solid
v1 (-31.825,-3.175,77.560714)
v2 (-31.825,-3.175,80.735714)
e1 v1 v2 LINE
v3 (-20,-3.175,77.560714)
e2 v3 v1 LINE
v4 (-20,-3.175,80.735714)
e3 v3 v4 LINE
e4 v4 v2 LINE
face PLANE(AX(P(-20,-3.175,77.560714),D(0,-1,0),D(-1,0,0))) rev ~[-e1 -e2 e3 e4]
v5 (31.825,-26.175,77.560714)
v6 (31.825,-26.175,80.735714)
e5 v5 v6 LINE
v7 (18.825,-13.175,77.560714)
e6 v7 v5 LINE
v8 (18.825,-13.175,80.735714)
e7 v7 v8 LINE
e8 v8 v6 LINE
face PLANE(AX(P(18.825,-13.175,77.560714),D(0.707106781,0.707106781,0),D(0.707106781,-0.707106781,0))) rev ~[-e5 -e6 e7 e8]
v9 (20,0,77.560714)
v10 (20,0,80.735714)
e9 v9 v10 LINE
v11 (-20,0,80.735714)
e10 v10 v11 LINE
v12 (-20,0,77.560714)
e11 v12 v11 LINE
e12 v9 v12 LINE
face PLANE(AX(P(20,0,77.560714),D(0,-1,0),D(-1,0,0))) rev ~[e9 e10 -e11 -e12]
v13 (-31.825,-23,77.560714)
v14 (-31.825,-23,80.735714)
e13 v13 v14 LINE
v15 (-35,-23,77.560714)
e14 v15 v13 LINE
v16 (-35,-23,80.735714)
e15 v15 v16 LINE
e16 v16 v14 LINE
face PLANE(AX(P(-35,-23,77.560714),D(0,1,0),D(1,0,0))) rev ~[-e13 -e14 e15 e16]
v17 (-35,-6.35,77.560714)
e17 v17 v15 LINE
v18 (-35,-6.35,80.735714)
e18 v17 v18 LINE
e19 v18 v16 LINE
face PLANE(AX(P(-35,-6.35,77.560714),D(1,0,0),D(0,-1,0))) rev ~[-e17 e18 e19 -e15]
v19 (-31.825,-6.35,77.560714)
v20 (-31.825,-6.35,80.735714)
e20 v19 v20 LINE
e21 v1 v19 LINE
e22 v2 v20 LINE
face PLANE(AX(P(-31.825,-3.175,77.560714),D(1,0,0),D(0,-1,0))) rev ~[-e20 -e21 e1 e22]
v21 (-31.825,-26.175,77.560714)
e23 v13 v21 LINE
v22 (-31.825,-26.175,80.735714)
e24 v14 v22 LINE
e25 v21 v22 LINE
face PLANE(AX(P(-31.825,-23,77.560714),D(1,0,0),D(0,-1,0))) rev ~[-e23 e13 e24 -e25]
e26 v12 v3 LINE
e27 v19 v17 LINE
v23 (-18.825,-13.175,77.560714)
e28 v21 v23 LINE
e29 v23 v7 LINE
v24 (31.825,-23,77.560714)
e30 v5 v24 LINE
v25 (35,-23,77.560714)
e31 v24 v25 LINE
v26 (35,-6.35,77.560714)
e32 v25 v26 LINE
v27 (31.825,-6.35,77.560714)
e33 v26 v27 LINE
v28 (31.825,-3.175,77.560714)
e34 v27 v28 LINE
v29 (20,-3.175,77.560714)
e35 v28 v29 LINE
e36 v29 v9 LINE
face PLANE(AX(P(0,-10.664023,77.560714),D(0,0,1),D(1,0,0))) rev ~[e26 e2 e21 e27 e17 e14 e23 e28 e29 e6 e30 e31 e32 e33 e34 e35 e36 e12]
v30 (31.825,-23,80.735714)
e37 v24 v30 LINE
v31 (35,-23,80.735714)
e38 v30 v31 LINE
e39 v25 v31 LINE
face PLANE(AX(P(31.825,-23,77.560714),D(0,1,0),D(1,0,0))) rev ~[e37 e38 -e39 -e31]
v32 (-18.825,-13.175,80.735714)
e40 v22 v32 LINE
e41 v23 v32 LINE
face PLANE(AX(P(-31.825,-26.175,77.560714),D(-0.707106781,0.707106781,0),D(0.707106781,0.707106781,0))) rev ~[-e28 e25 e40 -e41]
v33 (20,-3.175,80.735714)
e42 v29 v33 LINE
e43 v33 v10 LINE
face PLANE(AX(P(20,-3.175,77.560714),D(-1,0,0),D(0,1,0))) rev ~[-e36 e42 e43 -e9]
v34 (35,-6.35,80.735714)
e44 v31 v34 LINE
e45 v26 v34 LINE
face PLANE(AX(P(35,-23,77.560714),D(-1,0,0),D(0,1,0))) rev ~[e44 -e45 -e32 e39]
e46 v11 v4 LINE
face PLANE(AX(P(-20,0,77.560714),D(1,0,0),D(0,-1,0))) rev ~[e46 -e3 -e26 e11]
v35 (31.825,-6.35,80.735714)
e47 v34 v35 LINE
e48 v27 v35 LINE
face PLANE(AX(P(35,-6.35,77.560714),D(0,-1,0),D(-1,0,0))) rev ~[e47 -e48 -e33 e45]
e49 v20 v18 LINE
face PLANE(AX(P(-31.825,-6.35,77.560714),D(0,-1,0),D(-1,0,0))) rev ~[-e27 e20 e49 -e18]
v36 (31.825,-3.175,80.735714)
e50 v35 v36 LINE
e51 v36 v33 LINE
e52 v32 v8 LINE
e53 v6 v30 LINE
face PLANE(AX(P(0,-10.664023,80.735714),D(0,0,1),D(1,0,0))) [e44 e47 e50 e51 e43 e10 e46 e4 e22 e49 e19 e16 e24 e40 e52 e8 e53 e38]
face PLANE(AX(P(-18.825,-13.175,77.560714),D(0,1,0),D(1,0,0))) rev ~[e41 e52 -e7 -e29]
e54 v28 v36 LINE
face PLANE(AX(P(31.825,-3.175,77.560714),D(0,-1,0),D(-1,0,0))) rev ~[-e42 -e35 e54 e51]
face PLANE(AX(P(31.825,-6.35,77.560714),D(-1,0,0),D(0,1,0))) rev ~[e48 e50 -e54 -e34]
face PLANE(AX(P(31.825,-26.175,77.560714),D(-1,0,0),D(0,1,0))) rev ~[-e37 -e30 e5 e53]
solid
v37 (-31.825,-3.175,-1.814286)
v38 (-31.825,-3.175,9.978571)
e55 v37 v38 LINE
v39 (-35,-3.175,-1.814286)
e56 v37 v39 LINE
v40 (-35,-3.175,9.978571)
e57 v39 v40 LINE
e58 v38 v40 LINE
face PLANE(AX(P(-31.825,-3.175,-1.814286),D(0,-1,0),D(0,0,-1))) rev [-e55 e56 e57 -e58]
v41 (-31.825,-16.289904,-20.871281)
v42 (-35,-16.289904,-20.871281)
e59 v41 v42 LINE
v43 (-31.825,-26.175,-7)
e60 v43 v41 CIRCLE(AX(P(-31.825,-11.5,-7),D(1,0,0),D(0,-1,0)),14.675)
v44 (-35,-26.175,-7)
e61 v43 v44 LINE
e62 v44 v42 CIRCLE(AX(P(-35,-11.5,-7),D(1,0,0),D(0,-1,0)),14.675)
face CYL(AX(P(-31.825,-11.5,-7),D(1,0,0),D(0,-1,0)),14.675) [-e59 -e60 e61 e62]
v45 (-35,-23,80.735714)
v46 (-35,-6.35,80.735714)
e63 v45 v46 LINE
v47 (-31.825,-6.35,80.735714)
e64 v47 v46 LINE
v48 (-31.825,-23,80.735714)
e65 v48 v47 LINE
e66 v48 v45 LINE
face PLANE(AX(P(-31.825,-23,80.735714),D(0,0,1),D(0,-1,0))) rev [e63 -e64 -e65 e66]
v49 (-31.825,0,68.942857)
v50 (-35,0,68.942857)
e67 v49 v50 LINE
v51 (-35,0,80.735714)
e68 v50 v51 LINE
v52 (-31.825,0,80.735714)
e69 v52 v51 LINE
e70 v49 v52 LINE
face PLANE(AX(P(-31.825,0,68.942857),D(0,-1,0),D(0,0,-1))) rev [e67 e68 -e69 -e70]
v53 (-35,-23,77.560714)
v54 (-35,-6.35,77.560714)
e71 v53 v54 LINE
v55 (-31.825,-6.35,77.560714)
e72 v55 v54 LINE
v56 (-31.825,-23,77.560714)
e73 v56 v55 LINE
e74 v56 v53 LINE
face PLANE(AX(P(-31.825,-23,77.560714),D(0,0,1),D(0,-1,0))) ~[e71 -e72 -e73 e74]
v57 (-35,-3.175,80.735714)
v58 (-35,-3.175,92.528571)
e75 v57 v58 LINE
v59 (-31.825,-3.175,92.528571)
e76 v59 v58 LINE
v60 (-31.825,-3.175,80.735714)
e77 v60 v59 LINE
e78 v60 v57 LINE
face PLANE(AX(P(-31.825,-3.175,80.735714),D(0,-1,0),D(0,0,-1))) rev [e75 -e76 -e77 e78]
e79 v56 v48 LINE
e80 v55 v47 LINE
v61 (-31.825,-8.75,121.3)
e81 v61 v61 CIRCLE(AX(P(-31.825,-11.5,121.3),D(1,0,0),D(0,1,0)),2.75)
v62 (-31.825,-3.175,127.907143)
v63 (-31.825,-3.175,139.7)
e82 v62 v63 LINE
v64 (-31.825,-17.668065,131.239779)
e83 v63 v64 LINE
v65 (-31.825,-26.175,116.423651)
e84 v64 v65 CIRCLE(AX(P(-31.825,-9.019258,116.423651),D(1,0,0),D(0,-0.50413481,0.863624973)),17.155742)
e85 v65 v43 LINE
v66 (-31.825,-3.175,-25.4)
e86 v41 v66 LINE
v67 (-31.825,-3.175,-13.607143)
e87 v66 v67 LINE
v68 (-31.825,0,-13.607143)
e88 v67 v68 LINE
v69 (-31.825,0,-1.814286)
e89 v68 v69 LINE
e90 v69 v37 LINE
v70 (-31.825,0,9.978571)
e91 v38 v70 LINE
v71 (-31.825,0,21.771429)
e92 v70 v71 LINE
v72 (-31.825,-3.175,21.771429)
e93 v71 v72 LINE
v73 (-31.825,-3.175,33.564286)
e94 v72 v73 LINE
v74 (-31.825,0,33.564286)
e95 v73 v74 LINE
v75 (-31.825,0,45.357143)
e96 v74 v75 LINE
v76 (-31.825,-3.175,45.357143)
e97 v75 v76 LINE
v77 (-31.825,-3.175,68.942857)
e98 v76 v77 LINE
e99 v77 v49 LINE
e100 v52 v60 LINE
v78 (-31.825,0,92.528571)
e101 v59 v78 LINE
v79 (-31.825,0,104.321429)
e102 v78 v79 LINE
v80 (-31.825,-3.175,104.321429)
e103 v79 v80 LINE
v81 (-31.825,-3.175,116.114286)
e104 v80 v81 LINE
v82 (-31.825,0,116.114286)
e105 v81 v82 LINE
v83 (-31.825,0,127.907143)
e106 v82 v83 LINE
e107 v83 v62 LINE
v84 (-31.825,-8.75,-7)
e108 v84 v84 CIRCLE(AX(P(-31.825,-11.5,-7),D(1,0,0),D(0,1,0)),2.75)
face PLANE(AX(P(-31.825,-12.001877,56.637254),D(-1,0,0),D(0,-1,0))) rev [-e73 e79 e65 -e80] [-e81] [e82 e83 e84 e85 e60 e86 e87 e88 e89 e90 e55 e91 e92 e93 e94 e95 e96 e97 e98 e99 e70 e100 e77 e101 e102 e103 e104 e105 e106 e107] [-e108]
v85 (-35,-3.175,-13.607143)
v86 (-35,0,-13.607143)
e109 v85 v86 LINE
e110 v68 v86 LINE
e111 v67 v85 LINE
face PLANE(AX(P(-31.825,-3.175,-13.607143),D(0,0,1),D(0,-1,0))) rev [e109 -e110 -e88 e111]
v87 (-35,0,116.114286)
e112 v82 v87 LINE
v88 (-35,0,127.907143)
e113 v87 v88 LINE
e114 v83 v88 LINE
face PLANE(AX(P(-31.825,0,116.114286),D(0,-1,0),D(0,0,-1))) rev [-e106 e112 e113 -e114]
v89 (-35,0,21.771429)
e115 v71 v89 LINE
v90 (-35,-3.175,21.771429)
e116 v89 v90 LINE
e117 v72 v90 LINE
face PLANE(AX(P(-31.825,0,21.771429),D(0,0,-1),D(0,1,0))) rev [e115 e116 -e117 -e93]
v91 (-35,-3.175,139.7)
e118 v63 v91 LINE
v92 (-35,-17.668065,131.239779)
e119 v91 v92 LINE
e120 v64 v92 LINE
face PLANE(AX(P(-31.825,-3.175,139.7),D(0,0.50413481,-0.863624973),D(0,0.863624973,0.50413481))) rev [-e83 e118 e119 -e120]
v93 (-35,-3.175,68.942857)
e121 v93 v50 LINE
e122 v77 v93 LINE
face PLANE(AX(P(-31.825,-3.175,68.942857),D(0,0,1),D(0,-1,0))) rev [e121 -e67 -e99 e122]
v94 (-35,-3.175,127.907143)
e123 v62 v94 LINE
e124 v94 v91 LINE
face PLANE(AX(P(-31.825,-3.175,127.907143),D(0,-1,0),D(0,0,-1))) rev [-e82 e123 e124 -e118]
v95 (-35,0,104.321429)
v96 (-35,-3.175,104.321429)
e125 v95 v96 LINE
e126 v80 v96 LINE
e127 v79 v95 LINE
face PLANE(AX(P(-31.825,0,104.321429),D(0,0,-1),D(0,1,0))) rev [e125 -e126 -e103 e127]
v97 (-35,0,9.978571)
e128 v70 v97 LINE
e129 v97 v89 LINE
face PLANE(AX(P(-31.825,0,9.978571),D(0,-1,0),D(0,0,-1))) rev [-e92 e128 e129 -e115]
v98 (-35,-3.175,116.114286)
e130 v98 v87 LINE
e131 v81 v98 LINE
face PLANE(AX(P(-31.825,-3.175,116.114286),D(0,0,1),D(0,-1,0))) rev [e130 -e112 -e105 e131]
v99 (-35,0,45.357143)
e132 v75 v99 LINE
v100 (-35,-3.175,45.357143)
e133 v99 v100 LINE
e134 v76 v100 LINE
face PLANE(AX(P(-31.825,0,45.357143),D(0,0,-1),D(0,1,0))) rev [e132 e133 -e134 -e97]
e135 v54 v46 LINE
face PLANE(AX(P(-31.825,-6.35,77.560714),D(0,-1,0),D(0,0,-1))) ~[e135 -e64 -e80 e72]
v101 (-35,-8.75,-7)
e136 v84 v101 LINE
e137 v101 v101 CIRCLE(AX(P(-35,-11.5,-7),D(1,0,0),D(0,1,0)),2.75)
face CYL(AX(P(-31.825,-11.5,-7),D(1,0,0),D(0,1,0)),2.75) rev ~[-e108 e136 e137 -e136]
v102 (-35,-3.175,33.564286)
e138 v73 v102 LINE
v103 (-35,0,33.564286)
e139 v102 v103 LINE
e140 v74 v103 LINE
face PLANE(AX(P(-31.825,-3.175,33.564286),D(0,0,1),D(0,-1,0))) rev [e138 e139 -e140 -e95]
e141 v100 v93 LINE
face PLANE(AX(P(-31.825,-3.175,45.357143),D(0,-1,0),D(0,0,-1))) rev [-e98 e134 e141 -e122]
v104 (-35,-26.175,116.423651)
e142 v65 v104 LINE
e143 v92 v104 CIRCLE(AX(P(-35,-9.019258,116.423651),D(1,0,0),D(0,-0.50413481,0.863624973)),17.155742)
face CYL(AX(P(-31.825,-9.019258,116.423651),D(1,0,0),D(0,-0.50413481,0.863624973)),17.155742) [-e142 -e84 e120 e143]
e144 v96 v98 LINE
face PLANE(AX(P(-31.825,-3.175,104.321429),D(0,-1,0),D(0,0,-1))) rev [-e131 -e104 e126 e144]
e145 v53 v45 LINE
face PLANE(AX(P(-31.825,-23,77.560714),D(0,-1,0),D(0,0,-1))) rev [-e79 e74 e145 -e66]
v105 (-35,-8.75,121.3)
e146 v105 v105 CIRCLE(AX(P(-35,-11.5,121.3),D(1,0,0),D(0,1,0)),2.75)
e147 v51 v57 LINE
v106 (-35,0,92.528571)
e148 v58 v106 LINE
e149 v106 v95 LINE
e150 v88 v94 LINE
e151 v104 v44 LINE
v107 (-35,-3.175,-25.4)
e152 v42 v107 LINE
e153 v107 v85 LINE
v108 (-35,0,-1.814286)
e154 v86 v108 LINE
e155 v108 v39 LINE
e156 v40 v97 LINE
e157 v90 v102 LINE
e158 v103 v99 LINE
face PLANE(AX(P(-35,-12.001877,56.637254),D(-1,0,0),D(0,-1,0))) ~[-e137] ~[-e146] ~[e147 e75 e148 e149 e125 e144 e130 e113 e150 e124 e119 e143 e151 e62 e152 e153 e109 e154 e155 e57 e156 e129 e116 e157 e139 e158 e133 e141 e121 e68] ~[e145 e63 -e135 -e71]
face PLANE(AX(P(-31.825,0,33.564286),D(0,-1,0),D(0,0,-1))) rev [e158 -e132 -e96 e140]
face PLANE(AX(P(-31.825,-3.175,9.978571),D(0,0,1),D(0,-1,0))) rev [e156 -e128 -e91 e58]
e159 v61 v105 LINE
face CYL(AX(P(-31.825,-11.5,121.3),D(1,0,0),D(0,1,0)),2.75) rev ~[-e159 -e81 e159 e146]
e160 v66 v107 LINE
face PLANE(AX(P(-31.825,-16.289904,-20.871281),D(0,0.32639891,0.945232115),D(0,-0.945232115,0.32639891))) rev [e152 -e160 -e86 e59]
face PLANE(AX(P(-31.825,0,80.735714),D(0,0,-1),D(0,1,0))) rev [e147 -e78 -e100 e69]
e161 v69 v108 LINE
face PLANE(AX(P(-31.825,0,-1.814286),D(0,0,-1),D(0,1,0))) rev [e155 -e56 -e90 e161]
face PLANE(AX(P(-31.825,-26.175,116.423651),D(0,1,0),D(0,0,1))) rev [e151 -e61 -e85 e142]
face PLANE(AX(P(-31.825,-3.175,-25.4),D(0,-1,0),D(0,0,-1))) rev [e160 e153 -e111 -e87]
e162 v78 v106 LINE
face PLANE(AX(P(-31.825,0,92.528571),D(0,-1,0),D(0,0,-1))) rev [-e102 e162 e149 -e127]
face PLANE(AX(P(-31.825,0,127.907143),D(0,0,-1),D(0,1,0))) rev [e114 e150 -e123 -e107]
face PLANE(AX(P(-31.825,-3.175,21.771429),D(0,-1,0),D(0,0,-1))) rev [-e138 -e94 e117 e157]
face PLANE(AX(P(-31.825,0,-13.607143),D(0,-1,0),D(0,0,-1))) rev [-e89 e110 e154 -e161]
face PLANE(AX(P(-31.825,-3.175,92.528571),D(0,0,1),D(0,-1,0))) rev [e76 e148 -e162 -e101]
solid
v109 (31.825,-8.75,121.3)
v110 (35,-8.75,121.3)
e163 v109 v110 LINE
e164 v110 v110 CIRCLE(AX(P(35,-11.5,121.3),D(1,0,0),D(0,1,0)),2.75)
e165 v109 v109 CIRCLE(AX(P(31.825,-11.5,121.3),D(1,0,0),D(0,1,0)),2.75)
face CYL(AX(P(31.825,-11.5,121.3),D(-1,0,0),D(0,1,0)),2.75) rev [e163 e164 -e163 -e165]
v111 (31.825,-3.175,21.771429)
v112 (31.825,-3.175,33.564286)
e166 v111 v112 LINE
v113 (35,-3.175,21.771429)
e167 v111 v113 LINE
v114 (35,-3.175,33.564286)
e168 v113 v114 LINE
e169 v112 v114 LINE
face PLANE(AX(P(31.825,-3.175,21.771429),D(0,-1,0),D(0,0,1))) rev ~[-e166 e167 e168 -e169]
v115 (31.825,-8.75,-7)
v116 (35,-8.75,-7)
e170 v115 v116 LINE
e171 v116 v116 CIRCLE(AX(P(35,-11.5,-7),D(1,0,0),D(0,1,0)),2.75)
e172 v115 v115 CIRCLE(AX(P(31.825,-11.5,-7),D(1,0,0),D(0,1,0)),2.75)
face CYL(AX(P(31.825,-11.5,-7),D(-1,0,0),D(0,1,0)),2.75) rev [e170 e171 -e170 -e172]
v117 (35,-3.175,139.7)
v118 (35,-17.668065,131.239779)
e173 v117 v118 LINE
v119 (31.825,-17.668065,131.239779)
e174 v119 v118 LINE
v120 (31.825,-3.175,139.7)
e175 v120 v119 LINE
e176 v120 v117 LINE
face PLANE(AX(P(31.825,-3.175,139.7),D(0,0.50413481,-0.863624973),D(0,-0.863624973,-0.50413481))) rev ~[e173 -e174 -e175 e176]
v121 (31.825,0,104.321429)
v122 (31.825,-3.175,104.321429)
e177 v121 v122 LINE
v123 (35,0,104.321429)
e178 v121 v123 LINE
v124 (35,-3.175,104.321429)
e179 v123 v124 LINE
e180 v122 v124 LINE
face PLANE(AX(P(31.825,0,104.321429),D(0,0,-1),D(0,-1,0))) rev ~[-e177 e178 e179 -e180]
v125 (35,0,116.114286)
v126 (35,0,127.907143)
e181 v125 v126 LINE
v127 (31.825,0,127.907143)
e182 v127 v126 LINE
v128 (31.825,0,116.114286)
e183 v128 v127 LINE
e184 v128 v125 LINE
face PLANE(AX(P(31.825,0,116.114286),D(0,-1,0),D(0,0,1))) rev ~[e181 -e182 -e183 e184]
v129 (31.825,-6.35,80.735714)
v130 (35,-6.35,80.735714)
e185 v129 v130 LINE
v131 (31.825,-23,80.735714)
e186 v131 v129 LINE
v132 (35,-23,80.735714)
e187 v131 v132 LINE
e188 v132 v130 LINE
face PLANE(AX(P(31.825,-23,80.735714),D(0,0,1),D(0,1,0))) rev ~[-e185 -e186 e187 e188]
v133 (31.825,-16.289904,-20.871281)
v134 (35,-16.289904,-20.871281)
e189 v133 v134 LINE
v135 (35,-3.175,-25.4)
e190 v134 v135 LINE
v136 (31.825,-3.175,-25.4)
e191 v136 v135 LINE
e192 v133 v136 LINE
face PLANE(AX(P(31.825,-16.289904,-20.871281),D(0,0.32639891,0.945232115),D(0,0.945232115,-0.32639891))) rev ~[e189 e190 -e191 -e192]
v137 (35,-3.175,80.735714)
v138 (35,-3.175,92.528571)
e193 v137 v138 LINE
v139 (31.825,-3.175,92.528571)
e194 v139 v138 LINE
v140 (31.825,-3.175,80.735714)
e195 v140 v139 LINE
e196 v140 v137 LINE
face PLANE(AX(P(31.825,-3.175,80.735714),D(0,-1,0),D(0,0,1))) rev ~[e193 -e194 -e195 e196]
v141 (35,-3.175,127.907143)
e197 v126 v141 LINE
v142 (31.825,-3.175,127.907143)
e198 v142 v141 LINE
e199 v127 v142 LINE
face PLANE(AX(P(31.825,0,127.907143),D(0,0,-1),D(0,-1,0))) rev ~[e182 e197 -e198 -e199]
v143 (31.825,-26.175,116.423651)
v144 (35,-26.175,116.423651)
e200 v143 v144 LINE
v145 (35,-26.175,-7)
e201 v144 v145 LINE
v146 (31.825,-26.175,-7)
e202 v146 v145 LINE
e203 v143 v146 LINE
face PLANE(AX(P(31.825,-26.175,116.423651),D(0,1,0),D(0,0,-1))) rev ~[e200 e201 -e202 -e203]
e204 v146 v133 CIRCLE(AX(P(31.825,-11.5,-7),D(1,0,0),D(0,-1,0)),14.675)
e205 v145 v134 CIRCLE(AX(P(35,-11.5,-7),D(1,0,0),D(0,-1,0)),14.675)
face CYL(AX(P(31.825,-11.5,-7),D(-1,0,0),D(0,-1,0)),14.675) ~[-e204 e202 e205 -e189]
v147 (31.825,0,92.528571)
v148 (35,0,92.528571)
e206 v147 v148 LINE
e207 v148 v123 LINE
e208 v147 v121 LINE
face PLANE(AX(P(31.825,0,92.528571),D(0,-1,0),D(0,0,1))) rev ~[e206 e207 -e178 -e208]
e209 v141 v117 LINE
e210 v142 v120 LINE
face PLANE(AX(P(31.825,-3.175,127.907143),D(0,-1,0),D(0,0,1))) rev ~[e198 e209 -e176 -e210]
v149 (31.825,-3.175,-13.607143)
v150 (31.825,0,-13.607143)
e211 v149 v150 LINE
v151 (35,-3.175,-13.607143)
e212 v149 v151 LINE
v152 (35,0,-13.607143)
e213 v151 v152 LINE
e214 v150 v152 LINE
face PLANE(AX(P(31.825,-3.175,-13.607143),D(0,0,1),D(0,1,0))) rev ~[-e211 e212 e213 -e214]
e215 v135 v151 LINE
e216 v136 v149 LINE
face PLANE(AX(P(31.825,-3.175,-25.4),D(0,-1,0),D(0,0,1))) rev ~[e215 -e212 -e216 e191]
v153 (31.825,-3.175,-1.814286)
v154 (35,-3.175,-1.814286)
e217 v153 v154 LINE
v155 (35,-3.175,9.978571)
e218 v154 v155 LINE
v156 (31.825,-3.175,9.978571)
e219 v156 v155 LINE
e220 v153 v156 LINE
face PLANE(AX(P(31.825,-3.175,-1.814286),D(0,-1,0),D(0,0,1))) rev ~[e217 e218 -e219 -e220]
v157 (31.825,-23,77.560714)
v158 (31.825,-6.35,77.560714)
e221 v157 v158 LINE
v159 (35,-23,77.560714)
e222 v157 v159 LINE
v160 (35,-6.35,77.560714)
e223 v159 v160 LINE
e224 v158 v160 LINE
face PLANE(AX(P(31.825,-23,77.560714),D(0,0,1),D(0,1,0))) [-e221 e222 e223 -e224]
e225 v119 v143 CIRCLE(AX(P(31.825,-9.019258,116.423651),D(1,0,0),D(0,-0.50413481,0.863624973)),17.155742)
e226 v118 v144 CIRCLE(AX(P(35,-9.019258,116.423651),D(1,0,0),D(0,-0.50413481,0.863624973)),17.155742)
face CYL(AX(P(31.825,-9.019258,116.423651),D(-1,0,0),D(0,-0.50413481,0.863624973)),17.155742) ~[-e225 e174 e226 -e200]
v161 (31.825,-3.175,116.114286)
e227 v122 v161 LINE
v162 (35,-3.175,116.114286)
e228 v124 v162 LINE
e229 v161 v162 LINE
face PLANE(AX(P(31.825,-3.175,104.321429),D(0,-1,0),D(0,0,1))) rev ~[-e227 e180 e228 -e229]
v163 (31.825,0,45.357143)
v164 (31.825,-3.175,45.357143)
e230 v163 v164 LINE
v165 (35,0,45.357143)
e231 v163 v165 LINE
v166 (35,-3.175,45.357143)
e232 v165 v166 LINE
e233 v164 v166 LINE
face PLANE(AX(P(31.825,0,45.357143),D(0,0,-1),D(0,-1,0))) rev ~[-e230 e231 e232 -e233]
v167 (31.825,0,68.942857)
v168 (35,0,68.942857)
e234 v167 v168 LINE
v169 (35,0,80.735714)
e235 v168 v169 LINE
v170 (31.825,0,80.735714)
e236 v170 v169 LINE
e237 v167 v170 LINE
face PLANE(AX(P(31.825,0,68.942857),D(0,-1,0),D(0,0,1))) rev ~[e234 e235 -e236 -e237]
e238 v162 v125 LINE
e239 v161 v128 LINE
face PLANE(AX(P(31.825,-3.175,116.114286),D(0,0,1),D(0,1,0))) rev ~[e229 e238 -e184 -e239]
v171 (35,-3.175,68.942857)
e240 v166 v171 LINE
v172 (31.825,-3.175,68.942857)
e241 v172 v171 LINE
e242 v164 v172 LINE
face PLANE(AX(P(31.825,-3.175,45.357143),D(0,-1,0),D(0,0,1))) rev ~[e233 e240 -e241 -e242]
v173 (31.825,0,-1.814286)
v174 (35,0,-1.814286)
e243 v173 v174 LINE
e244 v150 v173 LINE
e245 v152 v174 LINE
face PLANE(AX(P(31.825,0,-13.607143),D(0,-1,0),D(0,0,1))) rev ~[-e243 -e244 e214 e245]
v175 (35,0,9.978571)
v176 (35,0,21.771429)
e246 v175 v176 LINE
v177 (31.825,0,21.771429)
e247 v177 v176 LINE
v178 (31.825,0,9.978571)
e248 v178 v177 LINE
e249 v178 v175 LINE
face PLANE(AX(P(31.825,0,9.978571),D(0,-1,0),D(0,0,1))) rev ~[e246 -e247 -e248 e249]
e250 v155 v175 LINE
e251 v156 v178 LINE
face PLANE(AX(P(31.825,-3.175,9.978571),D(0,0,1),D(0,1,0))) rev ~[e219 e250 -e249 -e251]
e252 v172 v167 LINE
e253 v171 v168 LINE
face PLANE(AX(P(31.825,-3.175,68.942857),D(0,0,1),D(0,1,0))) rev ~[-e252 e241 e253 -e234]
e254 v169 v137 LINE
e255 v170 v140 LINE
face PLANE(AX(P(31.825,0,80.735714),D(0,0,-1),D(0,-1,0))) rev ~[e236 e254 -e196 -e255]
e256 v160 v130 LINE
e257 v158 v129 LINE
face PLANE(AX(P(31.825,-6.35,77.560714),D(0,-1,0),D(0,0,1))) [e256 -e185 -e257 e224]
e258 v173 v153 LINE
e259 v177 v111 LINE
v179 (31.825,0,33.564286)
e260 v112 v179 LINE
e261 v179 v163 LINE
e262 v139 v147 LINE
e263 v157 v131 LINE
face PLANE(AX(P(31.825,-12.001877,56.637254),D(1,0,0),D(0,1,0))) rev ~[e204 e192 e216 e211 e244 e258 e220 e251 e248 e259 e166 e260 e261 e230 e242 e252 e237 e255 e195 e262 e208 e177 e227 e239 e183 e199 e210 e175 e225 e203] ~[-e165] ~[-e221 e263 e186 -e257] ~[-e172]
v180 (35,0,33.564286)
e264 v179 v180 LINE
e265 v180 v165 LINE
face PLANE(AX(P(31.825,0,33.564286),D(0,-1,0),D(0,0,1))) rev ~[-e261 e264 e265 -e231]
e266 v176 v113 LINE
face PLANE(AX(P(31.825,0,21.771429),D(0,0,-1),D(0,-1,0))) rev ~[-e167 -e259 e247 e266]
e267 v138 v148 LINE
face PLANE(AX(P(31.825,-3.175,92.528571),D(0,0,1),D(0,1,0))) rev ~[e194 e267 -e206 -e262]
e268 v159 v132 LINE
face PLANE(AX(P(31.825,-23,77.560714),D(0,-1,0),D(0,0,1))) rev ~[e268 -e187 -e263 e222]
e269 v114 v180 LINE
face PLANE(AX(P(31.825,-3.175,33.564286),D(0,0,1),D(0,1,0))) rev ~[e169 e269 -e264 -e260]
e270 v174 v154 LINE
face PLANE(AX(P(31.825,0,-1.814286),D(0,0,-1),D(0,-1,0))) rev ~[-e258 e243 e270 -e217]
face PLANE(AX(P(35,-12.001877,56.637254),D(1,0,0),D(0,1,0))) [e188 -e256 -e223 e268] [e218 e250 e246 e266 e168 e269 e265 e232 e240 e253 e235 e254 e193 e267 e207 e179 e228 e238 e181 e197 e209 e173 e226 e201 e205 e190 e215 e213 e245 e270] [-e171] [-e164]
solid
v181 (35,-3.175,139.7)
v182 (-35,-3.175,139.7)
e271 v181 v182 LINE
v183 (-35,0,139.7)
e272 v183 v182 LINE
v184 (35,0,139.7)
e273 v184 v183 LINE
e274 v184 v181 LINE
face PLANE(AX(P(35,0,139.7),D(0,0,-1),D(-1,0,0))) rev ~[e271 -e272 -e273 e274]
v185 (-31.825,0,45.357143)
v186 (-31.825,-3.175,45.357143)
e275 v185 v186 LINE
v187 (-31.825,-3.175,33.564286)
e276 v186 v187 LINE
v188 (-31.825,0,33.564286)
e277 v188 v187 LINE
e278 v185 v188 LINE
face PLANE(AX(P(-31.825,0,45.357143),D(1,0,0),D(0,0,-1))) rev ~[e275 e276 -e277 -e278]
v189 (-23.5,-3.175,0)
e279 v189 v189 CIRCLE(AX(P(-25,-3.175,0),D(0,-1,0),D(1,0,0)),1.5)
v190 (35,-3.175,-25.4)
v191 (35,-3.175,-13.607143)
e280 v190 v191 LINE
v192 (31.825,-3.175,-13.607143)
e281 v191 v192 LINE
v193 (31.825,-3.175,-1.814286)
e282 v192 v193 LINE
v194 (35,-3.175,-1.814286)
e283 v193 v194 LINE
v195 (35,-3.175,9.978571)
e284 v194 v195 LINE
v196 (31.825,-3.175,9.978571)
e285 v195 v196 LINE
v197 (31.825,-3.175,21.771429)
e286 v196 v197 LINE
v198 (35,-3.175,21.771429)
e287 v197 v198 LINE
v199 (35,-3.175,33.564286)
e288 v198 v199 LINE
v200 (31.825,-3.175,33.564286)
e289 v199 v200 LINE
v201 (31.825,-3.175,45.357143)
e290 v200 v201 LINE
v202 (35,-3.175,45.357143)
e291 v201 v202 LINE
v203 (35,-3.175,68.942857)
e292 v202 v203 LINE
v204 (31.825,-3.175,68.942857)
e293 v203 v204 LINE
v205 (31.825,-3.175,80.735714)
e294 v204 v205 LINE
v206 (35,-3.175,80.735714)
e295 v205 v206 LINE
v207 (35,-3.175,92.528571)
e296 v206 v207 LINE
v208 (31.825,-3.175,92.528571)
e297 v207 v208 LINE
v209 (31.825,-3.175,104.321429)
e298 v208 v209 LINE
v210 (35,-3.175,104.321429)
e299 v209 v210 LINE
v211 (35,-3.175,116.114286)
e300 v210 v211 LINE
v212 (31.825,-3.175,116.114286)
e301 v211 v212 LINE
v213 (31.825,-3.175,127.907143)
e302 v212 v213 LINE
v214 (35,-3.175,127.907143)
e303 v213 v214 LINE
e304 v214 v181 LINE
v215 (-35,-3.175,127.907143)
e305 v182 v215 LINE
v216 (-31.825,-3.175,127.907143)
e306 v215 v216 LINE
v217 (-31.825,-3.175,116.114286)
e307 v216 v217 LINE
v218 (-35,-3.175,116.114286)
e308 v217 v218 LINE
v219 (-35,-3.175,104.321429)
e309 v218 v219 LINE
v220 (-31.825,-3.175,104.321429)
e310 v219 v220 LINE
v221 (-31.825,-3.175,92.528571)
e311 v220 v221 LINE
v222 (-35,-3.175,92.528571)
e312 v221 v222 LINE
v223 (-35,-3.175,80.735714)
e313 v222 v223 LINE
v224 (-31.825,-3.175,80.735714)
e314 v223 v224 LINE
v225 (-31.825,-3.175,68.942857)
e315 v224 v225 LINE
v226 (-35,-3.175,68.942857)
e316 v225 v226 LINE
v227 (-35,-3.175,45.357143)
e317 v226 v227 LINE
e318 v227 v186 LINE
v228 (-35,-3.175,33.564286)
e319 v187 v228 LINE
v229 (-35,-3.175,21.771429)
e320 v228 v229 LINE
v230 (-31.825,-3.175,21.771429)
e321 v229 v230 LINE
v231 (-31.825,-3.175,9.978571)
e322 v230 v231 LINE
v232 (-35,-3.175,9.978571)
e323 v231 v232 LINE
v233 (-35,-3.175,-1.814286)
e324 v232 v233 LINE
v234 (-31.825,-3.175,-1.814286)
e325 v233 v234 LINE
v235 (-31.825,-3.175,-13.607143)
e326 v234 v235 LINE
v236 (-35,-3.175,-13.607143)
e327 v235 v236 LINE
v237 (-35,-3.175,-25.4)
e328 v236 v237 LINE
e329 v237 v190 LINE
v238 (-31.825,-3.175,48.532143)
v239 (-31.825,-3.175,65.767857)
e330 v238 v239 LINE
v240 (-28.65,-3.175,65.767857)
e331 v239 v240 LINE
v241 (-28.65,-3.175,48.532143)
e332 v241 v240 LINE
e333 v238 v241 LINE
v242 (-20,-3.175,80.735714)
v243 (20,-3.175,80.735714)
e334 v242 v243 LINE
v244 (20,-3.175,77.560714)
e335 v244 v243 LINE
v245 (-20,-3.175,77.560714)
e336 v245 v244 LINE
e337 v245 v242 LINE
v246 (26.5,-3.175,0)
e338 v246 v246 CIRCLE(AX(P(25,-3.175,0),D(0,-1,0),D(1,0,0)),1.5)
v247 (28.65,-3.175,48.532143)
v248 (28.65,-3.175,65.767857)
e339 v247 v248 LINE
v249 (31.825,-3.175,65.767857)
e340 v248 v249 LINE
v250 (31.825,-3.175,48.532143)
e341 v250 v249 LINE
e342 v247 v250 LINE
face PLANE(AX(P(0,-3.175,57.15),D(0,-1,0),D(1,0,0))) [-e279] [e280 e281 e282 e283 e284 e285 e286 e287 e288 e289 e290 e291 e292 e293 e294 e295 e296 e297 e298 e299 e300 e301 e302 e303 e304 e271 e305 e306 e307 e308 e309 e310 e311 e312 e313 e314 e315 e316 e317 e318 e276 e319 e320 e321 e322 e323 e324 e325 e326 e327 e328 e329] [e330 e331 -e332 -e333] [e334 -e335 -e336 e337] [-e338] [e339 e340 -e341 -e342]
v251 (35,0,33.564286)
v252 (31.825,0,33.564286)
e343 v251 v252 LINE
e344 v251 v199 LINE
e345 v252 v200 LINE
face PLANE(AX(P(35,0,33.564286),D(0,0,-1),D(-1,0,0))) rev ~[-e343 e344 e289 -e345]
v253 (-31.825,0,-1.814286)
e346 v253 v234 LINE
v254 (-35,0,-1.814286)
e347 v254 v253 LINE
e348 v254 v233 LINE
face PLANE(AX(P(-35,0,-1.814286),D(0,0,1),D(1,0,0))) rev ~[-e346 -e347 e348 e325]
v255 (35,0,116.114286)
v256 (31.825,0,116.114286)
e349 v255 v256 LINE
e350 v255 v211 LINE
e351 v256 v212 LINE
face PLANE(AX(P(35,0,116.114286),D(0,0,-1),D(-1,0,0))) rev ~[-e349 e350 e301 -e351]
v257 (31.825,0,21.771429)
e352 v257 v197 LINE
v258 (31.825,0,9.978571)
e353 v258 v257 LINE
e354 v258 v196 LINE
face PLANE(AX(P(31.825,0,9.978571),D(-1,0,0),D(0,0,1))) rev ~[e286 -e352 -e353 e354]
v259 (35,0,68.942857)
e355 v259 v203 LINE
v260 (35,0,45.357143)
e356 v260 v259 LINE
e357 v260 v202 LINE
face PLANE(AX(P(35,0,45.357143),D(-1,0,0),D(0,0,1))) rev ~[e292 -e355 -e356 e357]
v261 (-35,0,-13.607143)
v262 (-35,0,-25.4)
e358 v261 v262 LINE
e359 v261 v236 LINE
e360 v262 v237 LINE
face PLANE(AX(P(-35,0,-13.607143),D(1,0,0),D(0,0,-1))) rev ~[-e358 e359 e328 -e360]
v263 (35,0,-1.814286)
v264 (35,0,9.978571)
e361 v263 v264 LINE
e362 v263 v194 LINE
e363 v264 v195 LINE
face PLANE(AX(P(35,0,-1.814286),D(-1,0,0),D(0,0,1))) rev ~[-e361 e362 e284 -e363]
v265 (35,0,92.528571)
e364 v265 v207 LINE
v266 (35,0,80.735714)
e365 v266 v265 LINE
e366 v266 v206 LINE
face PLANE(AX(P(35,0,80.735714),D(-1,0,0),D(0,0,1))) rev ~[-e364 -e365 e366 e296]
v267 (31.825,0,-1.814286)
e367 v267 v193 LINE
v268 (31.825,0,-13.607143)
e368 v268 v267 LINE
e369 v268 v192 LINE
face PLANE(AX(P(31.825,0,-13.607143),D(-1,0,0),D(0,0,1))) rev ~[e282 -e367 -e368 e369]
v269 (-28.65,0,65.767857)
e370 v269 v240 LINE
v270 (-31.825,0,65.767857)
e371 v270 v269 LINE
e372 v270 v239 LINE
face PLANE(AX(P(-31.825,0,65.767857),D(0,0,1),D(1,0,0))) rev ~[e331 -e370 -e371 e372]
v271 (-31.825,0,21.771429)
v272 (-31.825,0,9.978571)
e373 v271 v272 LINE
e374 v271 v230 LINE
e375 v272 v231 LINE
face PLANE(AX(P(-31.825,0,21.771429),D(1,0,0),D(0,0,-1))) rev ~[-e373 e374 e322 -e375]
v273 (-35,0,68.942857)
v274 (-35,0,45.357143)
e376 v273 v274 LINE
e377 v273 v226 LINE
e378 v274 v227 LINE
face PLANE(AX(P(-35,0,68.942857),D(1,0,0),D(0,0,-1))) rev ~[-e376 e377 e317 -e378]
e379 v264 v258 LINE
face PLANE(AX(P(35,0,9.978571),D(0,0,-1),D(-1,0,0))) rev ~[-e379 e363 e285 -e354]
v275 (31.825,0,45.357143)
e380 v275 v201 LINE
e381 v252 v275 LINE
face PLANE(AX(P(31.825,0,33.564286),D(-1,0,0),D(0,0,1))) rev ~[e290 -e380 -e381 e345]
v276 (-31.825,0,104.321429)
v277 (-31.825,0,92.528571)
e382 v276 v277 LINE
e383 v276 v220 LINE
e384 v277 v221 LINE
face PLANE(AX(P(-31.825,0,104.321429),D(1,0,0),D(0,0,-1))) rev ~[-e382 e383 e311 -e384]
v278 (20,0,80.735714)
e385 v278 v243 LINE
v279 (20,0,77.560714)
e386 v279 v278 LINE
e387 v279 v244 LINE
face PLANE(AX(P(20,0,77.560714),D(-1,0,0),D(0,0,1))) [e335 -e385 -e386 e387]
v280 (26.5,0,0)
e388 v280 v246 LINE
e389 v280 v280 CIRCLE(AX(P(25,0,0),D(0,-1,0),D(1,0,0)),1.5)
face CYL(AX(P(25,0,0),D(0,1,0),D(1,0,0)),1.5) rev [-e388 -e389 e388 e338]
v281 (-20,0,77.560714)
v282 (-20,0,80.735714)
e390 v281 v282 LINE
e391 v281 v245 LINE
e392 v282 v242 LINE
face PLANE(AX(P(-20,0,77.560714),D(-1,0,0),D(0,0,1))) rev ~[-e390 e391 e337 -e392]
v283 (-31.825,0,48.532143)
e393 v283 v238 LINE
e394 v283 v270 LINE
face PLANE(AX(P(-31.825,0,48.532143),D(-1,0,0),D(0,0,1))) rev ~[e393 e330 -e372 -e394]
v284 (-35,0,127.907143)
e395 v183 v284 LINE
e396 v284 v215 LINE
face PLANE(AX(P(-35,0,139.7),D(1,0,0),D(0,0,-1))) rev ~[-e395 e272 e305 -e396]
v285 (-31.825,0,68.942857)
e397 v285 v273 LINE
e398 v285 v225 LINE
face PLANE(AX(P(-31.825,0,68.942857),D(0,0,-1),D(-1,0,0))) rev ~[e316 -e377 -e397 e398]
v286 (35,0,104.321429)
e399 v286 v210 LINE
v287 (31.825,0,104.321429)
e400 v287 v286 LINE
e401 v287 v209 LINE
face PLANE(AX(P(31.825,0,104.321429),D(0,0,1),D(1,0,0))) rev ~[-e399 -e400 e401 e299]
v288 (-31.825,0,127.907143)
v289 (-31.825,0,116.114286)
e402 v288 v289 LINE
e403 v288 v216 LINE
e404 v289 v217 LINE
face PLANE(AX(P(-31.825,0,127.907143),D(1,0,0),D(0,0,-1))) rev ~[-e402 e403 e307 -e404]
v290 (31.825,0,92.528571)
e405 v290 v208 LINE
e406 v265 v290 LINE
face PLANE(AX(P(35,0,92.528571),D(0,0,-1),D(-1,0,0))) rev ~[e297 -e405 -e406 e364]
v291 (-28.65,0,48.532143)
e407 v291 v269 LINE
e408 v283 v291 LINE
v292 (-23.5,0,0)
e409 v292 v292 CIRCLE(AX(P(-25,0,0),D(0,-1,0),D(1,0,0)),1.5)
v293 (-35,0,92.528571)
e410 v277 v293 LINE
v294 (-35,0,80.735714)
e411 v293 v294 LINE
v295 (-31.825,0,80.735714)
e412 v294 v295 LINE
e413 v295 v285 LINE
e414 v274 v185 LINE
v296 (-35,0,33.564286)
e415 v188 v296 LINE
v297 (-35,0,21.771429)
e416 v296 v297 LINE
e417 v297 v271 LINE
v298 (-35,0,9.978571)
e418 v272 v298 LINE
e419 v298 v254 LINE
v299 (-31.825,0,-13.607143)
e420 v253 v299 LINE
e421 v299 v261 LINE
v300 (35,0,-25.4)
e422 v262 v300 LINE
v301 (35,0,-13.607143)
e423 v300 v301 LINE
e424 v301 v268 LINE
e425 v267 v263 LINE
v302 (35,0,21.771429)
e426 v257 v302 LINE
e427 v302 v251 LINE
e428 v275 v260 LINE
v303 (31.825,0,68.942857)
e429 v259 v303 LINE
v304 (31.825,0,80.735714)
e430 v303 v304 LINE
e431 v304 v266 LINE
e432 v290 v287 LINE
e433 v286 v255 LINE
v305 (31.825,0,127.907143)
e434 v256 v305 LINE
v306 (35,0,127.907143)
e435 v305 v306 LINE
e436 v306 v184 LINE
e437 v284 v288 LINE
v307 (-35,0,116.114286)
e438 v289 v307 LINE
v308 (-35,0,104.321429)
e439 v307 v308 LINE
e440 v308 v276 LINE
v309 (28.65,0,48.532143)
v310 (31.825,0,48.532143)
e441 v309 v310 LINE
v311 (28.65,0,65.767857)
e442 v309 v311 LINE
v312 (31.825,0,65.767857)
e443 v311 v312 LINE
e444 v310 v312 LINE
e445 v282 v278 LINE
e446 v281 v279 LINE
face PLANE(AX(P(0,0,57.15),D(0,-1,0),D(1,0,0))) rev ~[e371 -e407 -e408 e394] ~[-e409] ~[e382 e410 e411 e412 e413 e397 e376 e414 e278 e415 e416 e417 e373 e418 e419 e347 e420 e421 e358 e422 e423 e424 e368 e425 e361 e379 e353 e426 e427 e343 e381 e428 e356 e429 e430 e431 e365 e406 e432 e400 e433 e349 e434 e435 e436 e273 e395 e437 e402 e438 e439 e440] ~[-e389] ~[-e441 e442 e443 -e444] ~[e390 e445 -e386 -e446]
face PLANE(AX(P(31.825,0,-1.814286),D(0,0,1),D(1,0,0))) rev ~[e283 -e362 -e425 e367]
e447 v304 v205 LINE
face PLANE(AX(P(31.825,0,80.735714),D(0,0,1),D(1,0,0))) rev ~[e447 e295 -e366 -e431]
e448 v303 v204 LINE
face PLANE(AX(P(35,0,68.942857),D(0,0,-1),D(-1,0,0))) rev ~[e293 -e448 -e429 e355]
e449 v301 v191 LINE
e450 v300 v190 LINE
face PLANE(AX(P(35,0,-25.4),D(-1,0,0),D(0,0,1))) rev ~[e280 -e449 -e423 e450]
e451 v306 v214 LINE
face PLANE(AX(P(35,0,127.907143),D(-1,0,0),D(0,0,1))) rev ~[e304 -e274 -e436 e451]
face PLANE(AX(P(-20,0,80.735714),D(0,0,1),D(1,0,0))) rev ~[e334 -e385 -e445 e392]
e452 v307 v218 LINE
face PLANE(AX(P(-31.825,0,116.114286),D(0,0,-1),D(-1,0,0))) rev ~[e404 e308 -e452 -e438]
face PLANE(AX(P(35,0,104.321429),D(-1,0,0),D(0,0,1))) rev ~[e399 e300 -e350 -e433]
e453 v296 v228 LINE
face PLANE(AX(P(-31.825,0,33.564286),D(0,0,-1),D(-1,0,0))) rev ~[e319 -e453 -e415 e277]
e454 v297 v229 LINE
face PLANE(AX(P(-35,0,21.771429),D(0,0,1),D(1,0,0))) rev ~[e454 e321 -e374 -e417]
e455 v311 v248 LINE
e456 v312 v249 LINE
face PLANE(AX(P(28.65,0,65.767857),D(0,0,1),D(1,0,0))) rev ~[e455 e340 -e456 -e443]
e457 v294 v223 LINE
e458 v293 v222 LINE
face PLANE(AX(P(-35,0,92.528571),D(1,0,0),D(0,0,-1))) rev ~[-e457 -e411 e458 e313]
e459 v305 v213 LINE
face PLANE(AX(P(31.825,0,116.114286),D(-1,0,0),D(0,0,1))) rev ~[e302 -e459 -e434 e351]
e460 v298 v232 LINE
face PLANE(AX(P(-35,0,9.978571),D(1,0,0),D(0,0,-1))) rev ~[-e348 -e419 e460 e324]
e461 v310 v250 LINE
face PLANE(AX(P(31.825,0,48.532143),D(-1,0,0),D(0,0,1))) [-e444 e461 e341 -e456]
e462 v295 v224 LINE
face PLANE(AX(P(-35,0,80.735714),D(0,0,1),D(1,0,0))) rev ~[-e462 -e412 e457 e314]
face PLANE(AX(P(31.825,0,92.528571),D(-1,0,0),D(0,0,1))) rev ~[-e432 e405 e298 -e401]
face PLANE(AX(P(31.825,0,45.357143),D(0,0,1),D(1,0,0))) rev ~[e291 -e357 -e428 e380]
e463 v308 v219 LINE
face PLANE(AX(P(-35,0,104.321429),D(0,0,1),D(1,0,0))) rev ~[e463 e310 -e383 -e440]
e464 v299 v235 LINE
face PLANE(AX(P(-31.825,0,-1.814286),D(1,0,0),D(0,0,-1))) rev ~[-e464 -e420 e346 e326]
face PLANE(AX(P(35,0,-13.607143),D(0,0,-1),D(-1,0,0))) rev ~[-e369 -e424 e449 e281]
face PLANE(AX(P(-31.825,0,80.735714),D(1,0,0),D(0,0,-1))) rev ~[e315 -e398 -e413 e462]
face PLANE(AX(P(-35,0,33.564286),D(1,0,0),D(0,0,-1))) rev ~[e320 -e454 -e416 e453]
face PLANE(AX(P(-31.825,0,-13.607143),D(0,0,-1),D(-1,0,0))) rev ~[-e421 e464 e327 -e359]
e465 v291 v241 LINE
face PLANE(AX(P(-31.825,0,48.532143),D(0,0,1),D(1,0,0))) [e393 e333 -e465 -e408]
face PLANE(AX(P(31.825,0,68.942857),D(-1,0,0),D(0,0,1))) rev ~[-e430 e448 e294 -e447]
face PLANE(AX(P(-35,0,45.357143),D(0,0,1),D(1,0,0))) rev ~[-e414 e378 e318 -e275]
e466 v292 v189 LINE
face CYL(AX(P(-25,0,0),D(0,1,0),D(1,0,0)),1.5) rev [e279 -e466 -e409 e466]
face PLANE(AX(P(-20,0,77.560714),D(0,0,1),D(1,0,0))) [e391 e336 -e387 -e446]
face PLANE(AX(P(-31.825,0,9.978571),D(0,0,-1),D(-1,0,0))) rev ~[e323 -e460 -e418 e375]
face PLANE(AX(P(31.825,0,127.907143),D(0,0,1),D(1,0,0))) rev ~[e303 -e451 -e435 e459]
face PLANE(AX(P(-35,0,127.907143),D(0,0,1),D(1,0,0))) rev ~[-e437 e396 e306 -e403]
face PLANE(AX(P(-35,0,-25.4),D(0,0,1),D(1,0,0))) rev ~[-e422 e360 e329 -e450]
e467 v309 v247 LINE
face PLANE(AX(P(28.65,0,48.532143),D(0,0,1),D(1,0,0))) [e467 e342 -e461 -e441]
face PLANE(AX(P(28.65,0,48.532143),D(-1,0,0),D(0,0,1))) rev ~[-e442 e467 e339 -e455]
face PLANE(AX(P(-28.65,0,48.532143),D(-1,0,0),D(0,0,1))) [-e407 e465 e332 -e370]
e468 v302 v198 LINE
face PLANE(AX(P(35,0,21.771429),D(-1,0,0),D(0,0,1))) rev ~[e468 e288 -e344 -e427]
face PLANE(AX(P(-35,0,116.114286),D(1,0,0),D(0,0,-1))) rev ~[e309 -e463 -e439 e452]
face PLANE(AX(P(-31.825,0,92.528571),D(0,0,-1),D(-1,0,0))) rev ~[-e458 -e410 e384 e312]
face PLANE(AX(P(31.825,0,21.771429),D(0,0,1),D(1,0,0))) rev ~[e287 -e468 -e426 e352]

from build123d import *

# Parameters (mm, degrees)
F2_R     = 1.5
F2_W     = 3.175
F2_H     = 17.2357142857
F2_W_2   = 40
F2_H_2   = 3.175
F3_DEPTH = 3.175
F5_START = 31.825
F4_R     = 2.75
F4_W     = 16.65
F4_H     = 3.175
F5_DEPTH = 3.175
F8_DEPTH = 3.175


# Not quite as in the source:
# - a length typed as a fraction of an inch, garbled in the dataset ("3 / 203.2 mm" for 3/8 in), is restored


with BuildPart() as f3:
    # F2 (on Front) → F3 (new body)
    with BuildSketch(Plane.XZ):
        Polygon((-35, -25.4), (0, -25.4), (35, -25.4), (35, -13.6071428571), (31.825, -13.6071428571), (31.825, -1.8142857143), (35, -1.8142857143), (35, 9.9785714286), (31.825, 9.9785714286), (31.825, 21.7714285714), (35, 21.7714285714), (35, 33.5642857143), (31.825, 33.5642857143), (31.825, 45.3571428571), (35, 45.3571428571), (35, 57.15), (35, 68.9428571429), (31.825, 68.9428571429), (31.825, 80.7357142857), (35, 80.7357142857), (35, 92.5285714286), (31.825, 92.5285714286), (31.825, 104.3214285714), (35, 104.3214285714), (35, 116.1142857143), (31.825, 116.1142857143), (31.825, 127.9071428571), (35, 127.9071428571), (35, 139.7), (0, 139.7), (-35, 139.7), (-35, 127.9071428571), (-31.825, 127.9071428571), (-31.825, 116.1142857143), (-35, 116.1142857143), (-35, 104.3214285714), (-31.825, 104.3214285714), (-31.825, 92.5285714286), (-35, 92.5285714286), (-35, 80.7357142857), (-31.825, 80.7357142857), (-31.825, 68.9428571429), (-35, 68.9428571429), (-35, 57.15), (-35, 45.3571428571), (-31.825, 45.3571428571), (-31.825, 33.5642857143), (-35, 33.5642857143), (-35, 21.7714285714), (-31.825, 21.7714285714), (-31.825, 9.9785714286), (-35, 9.9785714286), (-35, -1.8142857143), (-31.825, -1.8142857143), (-31.825, -13.6071428571), (-35, -13.6071428571), align=None)
        with Locations((-25, 0)):
            Circle(F2_R, mode=Mode.SUBTRACT)
        with Locations((25, 0)):
            Circle(F2_R, mode=Mode.SUBTRACT)
        with Locations((-30.2375, 57.15)):
            Rectangle(F2_W, F2_H, mode=Mode.SUBTRACT)
        with Locations((0, 79.1482142857)):
            Rectangle(F2_W_2, F2_H_2, mode=Mode.SUBTRACT)
        with Locations((30.2375, 57.15)):
            Rectangle(F2_W, F2_H, mode=Mode.SUBTRACT)
    extrude(amount=F3_DEPTH)


with BuildPart() as f5:
    # F4 (on Right) → F5 (new body)
    with BuildSketch(Plane.YZ.offset(F5_START)):
        with BuildLine():
            Line((-16.2899039976, -20.8712812924), (-3.175, -25.4))
            Line((-3.175, -25.4), (-3.175, -13.6071428571))
            Line((-3.175, -13.6071428571), (0, -13.6071428571))
            Line((0, -13.6071428571), (0, -1.8142857143))
            Line((0, -1.8142857143), (-3.175, -1.8142857143))
            Line((-3.175, -1.8142857143), (-3.175, 9.9785714286))
            Line((-3.175, 9.9785714286), (0, 9.9785714286))
            Line((0, 9.9785714286), (0, 21.7714285714))
            Line((0, 21.7714285714), (-3.175, 21.7714285714))
            Line((-3.175, 21.7714285714), (-3.175, 33.5642857143))
            Line((-3.175, 33.5642857143), (0, 33.5642857143))
            Line((0, 33.5642857143), (0, 45.3571428571))
            Line((0, 45.3571428571), (-3.175, 45.3571428571))
            Line((-3.175, 45.3571428571), (-3.175, 57.15))
            Line((-3.175, 57.15), (-3.175, 68.9428571429))
            Line((-3.175, 68.9428571429), (0, 68.9428571429))
            Line((0, 68.9428571429), (0, 80.7357142857))
            Line((0, 80.7357142857), (-3.175, 80.7357142857))
            Line((-3.175, 80.7357142857), (-3.175, 92.5285714286))
            Line((-3.175, 92.5285714286), (0, 92.5285714286))
            Line((0, 92.5285714286), (0, 104.3214285714))
            Line((0, 104.3214285714), (-3.175, 104.3214285714))
            Line((-3.175, 104.3214285714), (-3.175, 116.1142857143))
            Line((-3.175, 116.1142857143), (0, 116.1142857143))
            Line((0, 116.1142857143), (0, 127.9071428571))
            Line((0, 127.9071428571), (-3.175, 127.9071428571))
            Line((-3.175, 127.9071428571), (-3.175, 139.7))
            Line((-3.175, 139.7), (-17.6680646356, 131.239778703))
            ThreePointArc((-17.6680646356, 131.239778703), (-23.8970296567, 124.9659809178), (-26.175, 116.4236513176))
            Line((-26.175, 116.4236513176), (-26.175, -7))
            ThreePointArc((-26.175, -7), (-23.4508883805, -15.5165657349), (-16.2899039976, -20.8712812924))
        make_face()
        with Locations((-11.5, -7)):
            Circle(F4_R, mode=Mode.SUBTRACT)
        with Locations((-14.675, 79.1482142857)):
            Rectangle(F4_W, F4_H, mode=Mode.SUBTRACT)
        with Locations((-11.5, 121.3)):
            Circle(F4_R, mode=Mode.SUBTRACT)
    extrude(amount=F5_DEPTH)


with BuildPart() as f6_1:
    # F6: instance of F5
    add(f5.part.mirror(Plane.YZ))


with BuildPart() as f8:
    # F7 (on face) → F8 (new body)
    with BuildSketch(Plane.XY.offset(77.5607142857)):
        Polygon((-18.825, -13.175), (0, -13.175), (18.825, -13.175), (31.825, -26.175), (31.825, -23), (35, -23), (35, -6.35), (31.825, -6.35), (31.825, -3.175), (20, -3.175), (20, 0), (0, 0), (-20, 0), (-20, -3.175), (-31.825, -3.175), (-31.825, -6.35), (-35, -6.35), (-35, -23), (-31.825, -23), (-31.825, -26.175), align=None)
    extrude(amount=F8_DEPTH)


solid = Compound([f3.part, f5.part, f6_1.part, f8.part])
